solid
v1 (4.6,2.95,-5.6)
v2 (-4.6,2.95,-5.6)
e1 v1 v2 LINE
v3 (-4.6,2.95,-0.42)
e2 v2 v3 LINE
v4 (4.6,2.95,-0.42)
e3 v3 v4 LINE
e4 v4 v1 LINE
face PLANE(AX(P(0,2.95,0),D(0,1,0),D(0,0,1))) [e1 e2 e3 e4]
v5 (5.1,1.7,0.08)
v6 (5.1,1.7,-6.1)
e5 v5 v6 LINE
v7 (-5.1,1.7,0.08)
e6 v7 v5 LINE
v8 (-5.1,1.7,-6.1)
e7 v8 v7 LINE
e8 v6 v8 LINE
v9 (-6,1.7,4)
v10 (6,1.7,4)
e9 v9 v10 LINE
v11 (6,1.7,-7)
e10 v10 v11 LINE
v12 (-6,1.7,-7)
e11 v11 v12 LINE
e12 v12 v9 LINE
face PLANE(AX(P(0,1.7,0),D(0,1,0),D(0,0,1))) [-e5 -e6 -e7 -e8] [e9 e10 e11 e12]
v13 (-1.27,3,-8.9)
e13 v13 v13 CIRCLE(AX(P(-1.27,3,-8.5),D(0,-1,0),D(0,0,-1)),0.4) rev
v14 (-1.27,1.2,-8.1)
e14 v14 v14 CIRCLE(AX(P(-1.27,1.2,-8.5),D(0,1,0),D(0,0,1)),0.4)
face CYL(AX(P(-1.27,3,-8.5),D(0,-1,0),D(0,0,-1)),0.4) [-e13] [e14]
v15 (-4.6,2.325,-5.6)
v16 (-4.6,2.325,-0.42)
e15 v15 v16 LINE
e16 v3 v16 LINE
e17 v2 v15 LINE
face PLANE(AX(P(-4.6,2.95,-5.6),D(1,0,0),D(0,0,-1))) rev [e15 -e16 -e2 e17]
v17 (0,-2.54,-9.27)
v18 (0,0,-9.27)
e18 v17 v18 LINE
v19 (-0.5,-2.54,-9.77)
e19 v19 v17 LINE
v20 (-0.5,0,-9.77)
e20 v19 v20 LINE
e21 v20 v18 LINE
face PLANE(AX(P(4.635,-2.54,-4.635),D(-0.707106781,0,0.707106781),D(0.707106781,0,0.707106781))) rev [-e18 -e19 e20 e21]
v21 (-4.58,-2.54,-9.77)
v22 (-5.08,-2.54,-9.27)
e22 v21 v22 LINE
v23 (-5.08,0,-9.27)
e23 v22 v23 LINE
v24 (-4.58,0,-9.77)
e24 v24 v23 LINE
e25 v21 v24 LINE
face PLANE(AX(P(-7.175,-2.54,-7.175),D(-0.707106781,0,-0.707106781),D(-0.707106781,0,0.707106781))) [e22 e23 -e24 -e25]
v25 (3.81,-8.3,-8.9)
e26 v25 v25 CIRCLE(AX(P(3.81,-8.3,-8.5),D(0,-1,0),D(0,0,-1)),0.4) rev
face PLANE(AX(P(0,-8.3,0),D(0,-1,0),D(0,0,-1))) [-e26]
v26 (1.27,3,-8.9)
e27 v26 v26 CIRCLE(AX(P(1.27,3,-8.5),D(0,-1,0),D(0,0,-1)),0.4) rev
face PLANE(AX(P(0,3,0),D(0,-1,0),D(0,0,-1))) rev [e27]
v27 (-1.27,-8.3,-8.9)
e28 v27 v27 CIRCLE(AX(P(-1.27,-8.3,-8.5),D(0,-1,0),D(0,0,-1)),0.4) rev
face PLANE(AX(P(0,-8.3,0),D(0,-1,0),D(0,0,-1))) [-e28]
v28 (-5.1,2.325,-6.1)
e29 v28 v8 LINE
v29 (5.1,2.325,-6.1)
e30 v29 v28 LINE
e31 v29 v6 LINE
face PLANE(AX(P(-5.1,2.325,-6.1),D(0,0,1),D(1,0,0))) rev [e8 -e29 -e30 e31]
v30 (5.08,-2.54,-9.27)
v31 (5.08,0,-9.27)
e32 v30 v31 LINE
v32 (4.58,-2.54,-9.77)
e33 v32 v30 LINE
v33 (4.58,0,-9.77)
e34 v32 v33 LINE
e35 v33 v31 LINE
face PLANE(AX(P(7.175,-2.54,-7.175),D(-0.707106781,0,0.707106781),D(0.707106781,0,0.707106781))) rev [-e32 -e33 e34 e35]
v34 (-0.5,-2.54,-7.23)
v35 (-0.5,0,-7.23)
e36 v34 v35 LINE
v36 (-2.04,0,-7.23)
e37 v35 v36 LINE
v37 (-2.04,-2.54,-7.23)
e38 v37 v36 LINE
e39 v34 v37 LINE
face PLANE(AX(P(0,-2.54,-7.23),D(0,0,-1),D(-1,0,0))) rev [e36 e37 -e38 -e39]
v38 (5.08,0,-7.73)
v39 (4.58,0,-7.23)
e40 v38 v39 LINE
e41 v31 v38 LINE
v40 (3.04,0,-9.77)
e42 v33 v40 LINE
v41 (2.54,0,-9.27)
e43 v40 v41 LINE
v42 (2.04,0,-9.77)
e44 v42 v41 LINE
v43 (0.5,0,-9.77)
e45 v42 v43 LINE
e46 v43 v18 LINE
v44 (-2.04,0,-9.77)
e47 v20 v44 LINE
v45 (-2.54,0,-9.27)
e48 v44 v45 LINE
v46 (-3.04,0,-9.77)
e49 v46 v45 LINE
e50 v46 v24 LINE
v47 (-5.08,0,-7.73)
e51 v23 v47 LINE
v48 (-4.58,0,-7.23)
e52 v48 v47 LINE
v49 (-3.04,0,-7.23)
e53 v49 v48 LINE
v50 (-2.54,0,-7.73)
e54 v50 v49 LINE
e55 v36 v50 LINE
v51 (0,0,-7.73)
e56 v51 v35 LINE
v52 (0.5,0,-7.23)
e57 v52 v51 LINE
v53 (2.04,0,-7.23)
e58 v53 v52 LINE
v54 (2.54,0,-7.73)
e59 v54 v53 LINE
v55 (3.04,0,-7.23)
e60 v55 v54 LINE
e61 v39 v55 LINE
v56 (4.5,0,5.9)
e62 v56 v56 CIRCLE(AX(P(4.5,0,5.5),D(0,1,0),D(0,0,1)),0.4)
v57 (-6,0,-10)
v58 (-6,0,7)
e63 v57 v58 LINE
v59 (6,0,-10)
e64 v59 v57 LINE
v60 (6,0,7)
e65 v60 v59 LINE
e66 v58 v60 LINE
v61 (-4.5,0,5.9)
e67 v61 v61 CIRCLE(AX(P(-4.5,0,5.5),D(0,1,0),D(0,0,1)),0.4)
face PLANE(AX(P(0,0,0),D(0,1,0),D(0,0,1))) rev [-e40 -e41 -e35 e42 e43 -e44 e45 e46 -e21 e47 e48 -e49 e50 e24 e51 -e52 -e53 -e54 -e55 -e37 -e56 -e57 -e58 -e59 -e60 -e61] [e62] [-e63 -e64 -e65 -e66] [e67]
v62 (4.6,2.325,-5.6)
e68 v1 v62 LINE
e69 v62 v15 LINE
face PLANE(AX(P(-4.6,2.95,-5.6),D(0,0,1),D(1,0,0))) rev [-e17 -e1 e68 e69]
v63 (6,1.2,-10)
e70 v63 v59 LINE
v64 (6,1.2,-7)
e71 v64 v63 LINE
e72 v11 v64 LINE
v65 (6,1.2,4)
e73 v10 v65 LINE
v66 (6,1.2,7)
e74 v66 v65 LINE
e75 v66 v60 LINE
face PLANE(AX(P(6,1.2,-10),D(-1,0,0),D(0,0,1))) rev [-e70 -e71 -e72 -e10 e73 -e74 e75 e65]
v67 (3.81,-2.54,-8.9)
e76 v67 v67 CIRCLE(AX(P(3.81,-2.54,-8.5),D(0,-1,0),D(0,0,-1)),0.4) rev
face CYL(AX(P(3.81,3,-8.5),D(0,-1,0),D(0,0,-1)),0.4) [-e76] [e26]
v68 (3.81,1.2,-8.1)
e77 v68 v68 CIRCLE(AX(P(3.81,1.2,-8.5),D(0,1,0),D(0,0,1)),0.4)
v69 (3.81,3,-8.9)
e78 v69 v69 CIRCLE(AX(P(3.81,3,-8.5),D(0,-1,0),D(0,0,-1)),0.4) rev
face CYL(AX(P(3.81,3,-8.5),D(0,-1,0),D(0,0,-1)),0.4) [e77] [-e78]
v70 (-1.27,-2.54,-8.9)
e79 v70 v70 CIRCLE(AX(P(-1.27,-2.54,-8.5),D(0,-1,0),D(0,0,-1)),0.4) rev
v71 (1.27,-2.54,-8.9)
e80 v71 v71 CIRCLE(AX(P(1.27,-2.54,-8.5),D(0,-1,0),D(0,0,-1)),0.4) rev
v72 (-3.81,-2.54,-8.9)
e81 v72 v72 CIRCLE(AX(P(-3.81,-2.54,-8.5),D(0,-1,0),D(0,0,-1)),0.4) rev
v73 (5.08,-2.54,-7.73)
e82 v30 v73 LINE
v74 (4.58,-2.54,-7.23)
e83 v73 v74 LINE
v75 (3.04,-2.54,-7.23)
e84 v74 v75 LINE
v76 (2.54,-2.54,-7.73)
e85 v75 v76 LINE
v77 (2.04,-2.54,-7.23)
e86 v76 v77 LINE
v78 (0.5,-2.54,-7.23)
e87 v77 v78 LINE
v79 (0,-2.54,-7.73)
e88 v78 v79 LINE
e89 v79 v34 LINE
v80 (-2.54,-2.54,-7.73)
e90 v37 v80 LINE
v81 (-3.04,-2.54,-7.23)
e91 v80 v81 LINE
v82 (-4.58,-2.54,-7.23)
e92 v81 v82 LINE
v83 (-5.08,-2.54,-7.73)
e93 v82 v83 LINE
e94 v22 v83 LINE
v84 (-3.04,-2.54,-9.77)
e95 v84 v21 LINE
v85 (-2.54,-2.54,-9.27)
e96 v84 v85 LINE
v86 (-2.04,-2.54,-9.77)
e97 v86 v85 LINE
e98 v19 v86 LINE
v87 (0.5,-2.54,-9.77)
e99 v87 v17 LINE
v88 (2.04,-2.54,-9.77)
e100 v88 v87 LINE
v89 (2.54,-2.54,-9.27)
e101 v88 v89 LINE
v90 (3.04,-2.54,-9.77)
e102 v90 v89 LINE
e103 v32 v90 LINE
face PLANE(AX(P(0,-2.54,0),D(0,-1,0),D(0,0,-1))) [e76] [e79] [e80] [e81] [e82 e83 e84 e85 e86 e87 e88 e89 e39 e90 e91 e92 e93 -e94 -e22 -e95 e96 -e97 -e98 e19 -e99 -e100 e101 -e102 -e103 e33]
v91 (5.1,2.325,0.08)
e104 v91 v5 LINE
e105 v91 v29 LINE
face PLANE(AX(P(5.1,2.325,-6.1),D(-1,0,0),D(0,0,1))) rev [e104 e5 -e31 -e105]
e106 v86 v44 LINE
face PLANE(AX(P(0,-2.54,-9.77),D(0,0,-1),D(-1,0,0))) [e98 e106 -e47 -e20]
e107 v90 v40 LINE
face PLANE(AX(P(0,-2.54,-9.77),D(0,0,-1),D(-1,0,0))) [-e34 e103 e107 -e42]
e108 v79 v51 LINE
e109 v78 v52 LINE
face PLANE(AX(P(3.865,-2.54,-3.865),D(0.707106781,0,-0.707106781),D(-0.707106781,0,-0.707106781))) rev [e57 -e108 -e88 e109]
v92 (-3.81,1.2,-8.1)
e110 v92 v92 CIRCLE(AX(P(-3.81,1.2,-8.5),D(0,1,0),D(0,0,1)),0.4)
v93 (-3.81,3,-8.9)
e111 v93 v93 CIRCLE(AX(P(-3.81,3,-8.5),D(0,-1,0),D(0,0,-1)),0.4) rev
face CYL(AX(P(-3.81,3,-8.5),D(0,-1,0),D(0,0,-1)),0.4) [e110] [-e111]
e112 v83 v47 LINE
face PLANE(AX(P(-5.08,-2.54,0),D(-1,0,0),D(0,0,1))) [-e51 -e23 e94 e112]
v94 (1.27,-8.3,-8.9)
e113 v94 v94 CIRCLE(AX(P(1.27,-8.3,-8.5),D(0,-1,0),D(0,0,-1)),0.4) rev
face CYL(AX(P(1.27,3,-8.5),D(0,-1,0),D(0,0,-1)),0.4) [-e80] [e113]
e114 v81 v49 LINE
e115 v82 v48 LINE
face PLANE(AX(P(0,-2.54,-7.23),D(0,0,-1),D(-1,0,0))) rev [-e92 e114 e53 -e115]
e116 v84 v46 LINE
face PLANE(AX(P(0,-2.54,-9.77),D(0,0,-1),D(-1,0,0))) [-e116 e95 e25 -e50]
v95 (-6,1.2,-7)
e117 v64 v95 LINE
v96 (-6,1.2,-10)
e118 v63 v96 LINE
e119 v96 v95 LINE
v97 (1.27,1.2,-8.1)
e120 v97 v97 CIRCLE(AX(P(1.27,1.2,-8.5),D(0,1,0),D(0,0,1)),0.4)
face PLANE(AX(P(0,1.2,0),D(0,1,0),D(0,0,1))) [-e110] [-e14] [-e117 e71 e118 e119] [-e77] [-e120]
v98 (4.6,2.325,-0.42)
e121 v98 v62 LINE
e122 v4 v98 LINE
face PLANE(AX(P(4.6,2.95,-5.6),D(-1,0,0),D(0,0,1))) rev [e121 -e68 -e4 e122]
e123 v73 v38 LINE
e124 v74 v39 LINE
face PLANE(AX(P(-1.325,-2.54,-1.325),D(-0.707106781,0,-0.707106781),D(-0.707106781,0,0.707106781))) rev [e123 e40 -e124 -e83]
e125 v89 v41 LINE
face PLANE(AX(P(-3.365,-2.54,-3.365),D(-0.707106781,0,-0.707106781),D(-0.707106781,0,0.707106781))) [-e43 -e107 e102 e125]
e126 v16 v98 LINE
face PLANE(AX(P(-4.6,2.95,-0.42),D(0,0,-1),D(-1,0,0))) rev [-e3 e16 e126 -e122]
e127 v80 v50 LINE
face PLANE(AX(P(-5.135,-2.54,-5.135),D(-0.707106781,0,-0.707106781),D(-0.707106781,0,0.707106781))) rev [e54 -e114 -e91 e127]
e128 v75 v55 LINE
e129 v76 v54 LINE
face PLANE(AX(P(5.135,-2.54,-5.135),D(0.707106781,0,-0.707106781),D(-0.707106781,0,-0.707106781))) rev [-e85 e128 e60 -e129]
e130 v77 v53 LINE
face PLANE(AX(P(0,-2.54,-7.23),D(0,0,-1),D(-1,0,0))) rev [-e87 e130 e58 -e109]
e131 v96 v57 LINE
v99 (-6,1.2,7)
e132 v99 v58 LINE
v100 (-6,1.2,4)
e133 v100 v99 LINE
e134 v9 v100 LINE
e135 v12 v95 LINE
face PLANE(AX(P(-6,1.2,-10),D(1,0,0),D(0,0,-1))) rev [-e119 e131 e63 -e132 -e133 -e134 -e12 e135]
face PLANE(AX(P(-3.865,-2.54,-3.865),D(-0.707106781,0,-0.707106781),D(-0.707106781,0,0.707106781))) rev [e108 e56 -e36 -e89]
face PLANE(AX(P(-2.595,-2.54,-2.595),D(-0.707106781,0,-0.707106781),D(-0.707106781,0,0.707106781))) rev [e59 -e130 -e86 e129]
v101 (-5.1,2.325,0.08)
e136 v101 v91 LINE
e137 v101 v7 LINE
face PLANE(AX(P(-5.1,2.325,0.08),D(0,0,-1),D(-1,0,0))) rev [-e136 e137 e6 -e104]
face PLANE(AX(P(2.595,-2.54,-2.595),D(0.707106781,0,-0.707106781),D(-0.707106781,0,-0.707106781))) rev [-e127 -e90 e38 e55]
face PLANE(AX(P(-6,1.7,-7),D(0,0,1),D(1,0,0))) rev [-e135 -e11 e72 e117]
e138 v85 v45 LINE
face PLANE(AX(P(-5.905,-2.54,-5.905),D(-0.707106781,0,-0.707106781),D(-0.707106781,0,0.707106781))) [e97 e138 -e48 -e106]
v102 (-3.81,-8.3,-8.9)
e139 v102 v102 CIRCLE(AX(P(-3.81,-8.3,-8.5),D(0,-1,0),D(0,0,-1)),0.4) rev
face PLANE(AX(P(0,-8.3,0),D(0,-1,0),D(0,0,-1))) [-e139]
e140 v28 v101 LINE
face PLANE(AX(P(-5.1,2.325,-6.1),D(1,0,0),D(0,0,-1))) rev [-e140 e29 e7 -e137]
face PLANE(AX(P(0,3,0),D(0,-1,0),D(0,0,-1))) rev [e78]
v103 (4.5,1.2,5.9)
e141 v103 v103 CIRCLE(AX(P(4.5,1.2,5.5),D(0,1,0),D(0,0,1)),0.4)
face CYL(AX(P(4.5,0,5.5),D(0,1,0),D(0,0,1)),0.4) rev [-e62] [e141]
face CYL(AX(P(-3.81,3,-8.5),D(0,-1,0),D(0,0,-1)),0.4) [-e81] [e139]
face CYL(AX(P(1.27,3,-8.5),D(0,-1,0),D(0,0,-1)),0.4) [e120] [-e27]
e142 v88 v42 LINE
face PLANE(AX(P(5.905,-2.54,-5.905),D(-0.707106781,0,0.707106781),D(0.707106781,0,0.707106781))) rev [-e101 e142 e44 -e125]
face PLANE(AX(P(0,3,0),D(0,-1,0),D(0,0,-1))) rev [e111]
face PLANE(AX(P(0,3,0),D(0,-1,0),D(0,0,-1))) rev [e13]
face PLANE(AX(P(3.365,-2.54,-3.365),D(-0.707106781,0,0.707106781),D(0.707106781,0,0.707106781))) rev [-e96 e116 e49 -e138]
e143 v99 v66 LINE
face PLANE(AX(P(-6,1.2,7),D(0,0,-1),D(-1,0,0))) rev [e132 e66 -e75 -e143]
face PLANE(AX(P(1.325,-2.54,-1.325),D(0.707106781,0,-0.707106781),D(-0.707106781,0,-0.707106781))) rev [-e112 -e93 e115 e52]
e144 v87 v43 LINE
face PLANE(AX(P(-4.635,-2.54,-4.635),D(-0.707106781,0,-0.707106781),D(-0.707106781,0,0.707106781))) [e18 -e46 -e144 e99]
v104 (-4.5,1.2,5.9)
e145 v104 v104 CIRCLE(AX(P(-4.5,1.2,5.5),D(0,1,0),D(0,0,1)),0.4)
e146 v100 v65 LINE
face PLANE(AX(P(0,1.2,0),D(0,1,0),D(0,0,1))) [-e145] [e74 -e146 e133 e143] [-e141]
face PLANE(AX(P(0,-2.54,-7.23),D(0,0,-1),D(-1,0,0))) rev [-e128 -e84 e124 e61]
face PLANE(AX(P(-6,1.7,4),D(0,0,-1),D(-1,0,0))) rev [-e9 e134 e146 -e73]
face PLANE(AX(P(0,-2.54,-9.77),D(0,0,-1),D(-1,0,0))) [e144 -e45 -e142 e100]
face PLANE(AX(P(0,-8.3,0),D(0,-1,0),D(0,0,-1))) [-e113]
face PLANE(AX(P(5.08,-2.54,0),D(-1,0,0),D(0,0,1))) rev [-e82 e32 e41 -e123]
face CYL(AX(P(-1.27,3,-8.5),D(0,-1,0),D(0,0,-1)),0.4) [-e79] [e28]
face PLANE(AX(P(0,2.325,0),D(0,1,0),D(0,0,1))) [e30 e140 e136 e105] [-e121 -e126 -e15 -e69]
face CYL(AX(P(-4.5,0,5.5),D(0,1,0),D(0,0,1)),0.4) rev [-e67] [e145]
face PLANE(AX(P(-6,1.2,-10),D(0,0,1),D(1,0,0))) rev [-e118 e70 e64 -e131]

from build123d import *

# Parameters (mm, degrees)
SKETCH1_W               = 12
SKETCH1_H               = 17
BOSS_EXTRUDE1_DEPTH     = 1.2
SKETCH2_W               = 12
SKETCH2_H               = 11
BOSS_EXTRUDE2_DEPTH     = 0.5
SKETCH3_R               = 0.4
CUT_EXTRUDE1_DEPTH      = 12.723480712
SKETCH4_W               = 10.2
SKETCH4_H               = 6.18
BOSS_EXTRUDE3_DEPTH     = 0.625
SKETCH5_W               = 9.2
SKETCH5_H               = 5.18
BOSS_EXTRUDE4_DEPTH     = 0.625
SKETCH6_R               = 0.4
BOSS_EXTRUDE5_DEPTH     = 2.54
BOSS_EXTRUDE6_START     = -3
BOSS_EXTRUDE6_OUTLINE_R = 0.4
BOSS_EXTRUDE6_DEPTH     = 11.3


# Read off the part's stored shape, not the designer's step: Boss-Extrude6
with BuildPart() as part:
    # Sketch1 → Boss-Extrude1 (new body)
    with BuildSketch(Plane(origin=(0, 0, 0), x_dir=(1, 0, 0), z_dir=(0, 1, 0))):
        with Locations((0, 1.5)):
            Rectangle(SKETCH1_W, SKETCH1_H)
    extrude(amount=BOSS_EXTRUDE1_DEPTH)

    # Sketch2 → Boss-Extrude2 (add)
    with BuildSketch(Plane(origin=(0, 1.2, 0), x_dir=(1, 0, 0), z_dir=(0, 1, 0))):
        with Locations((0, 1.5)):
            Rectangle(SKETCH2_W, SKETCH2_H)
    extrude(amount=BOSS_EXTRUDE2_DEPTH)

    # Sketch3 → Cut-Extrude1 (cut, through all)
    with BuildSketch(Plane(origin=(0, 1.2, 0), x_dir=(1, 0, 0), z_dir=(0, 1, 0))):
        with Locations(Location((-3.81, 8.5, 0), (0, 0, 270))):
            Circle(SKETCH3_R)
        with Locations(Location((-4.5, -5.5, 0), (0, 0, 270))):
            Circle(SKETCH3_R)
        with Locations(Location((4.5, -5.5, 0), (0, 0, 270))):
            Circle(SKETCH3_R)
        with Locations(Location((-1.27, 8.5, 0), (0, 0, 270))):
            Circle(SKETCH3_R)
        with Locations(Location((1.27, 8.5, 0), (0, 0, 270))):
            Circle(SKETCH3_R)
        with Locations(Location((3.81, 8.5, 0), (0, 0, 270))):
            Circle(SKETCH3_R)
    extrude(amount=-CUT_EXTRUDE1_DEPTH, mode=Mode.SUBTRACT)

    # Sketch4 → Boss-Extrude3 (add)
    with BuildSketch(Plane(origin=(0, 1.7, 0), x_dir=(1, 0, 0), z_dir=(0, 1, 0))):
        with Locations((0, 3.01)):
            Rectangle(SKETCH4_W, SKETCH4_H)
    extrude(amount=BOSS_EXTRUDE3_DEPTH)

    # Sketch5 → Boss-Extrude4 (add)
    with BuildSketch(Plane(origin=(0, 2.325, 0), x_dir=(1, 0, 0), z_dir=(0, 1, 0))):
        with Locations((0, 3.01)):
            Rectangle(SKETCH5_W, SKETCH5_H)
    extrude(amount=BOSS_EXTRUDE4_DEPTH)

    # Sketch6 → Boss-Extrude5 (add)
    with BuildSketch(Plane.XZ):
        Polygon((-3.04, -7.23), (-4.58, -7.23), (-5.08, -7.73), (-5.08, -9.27), (-4.58, -9.77), (-3.04, -9.77), (-2.54, -9.27), (-2.04, -9.77), (-0.5, -9.77), (0, -9.27), (0.5, -9.77), (2.04, -9.77), (2.54, -9.27), (3.04, -9.77), (4.58, -9.77), (5.08, -9.27), (5.08, -7.73), (4.58, -7.23), (3.04, -7.23), (2.54, -7.73), (2.04, -7.23), (0.5, -7.23), (0, -7.73), (-0.5, -7.23), (-2.04, -7.23), (-2.54, -7.73), align=None)
        with Locations(Location((-3.81, -8.5, 0), (0, 0, 90))):
            Circle(SKETCH6_R, mode=Mode.SUBTRACT)
        with Locations(Location((-1.27, -8.5, 0), (0, 0, 90))):
            Circle(SKETCH6_R, mode=Mode.SUBTRACT)
        with Locations(Location((1.27, -8.5, 0), (0, 0, 90))):
            Circle(SKETCH6_R, mode=Mode.SUBTRACT)
        with Locations(Location((3.81, -8.5, 0), (0, 0, 90))):
            Circle(SKETCH6_R, mode=Mode.SUBTRACT)
    extrude(amount=BOSS_EXTRUDE5_DEPTH)

    # Boss-Extrude6 outline → Boss-Extrude6 (add)
    with BuildSketch(Plane.XZ.offset(BOSS_EXTRUDE6_START)):
        with Locations((-3.81, -8.5)):
            Circle(BOSS_EXTRUDE6_OUTLINE_R)
        with Locations((-1.27, -8.5)):
            Circle(BOSS_EXTRUDE6_OUTLINE_R)
        with Locations((1.27, -8.5)):
            Circle(BOSS_EXTRUDE6_OUTLINE_R)
        with Locations((3.81, -8.5)):
            Circle(BOSS_EXTRUDE6_OUTLINE_R)
    extrude(amount=BOSS_EXTRUDE6_DEPTH)


solid = part.part
